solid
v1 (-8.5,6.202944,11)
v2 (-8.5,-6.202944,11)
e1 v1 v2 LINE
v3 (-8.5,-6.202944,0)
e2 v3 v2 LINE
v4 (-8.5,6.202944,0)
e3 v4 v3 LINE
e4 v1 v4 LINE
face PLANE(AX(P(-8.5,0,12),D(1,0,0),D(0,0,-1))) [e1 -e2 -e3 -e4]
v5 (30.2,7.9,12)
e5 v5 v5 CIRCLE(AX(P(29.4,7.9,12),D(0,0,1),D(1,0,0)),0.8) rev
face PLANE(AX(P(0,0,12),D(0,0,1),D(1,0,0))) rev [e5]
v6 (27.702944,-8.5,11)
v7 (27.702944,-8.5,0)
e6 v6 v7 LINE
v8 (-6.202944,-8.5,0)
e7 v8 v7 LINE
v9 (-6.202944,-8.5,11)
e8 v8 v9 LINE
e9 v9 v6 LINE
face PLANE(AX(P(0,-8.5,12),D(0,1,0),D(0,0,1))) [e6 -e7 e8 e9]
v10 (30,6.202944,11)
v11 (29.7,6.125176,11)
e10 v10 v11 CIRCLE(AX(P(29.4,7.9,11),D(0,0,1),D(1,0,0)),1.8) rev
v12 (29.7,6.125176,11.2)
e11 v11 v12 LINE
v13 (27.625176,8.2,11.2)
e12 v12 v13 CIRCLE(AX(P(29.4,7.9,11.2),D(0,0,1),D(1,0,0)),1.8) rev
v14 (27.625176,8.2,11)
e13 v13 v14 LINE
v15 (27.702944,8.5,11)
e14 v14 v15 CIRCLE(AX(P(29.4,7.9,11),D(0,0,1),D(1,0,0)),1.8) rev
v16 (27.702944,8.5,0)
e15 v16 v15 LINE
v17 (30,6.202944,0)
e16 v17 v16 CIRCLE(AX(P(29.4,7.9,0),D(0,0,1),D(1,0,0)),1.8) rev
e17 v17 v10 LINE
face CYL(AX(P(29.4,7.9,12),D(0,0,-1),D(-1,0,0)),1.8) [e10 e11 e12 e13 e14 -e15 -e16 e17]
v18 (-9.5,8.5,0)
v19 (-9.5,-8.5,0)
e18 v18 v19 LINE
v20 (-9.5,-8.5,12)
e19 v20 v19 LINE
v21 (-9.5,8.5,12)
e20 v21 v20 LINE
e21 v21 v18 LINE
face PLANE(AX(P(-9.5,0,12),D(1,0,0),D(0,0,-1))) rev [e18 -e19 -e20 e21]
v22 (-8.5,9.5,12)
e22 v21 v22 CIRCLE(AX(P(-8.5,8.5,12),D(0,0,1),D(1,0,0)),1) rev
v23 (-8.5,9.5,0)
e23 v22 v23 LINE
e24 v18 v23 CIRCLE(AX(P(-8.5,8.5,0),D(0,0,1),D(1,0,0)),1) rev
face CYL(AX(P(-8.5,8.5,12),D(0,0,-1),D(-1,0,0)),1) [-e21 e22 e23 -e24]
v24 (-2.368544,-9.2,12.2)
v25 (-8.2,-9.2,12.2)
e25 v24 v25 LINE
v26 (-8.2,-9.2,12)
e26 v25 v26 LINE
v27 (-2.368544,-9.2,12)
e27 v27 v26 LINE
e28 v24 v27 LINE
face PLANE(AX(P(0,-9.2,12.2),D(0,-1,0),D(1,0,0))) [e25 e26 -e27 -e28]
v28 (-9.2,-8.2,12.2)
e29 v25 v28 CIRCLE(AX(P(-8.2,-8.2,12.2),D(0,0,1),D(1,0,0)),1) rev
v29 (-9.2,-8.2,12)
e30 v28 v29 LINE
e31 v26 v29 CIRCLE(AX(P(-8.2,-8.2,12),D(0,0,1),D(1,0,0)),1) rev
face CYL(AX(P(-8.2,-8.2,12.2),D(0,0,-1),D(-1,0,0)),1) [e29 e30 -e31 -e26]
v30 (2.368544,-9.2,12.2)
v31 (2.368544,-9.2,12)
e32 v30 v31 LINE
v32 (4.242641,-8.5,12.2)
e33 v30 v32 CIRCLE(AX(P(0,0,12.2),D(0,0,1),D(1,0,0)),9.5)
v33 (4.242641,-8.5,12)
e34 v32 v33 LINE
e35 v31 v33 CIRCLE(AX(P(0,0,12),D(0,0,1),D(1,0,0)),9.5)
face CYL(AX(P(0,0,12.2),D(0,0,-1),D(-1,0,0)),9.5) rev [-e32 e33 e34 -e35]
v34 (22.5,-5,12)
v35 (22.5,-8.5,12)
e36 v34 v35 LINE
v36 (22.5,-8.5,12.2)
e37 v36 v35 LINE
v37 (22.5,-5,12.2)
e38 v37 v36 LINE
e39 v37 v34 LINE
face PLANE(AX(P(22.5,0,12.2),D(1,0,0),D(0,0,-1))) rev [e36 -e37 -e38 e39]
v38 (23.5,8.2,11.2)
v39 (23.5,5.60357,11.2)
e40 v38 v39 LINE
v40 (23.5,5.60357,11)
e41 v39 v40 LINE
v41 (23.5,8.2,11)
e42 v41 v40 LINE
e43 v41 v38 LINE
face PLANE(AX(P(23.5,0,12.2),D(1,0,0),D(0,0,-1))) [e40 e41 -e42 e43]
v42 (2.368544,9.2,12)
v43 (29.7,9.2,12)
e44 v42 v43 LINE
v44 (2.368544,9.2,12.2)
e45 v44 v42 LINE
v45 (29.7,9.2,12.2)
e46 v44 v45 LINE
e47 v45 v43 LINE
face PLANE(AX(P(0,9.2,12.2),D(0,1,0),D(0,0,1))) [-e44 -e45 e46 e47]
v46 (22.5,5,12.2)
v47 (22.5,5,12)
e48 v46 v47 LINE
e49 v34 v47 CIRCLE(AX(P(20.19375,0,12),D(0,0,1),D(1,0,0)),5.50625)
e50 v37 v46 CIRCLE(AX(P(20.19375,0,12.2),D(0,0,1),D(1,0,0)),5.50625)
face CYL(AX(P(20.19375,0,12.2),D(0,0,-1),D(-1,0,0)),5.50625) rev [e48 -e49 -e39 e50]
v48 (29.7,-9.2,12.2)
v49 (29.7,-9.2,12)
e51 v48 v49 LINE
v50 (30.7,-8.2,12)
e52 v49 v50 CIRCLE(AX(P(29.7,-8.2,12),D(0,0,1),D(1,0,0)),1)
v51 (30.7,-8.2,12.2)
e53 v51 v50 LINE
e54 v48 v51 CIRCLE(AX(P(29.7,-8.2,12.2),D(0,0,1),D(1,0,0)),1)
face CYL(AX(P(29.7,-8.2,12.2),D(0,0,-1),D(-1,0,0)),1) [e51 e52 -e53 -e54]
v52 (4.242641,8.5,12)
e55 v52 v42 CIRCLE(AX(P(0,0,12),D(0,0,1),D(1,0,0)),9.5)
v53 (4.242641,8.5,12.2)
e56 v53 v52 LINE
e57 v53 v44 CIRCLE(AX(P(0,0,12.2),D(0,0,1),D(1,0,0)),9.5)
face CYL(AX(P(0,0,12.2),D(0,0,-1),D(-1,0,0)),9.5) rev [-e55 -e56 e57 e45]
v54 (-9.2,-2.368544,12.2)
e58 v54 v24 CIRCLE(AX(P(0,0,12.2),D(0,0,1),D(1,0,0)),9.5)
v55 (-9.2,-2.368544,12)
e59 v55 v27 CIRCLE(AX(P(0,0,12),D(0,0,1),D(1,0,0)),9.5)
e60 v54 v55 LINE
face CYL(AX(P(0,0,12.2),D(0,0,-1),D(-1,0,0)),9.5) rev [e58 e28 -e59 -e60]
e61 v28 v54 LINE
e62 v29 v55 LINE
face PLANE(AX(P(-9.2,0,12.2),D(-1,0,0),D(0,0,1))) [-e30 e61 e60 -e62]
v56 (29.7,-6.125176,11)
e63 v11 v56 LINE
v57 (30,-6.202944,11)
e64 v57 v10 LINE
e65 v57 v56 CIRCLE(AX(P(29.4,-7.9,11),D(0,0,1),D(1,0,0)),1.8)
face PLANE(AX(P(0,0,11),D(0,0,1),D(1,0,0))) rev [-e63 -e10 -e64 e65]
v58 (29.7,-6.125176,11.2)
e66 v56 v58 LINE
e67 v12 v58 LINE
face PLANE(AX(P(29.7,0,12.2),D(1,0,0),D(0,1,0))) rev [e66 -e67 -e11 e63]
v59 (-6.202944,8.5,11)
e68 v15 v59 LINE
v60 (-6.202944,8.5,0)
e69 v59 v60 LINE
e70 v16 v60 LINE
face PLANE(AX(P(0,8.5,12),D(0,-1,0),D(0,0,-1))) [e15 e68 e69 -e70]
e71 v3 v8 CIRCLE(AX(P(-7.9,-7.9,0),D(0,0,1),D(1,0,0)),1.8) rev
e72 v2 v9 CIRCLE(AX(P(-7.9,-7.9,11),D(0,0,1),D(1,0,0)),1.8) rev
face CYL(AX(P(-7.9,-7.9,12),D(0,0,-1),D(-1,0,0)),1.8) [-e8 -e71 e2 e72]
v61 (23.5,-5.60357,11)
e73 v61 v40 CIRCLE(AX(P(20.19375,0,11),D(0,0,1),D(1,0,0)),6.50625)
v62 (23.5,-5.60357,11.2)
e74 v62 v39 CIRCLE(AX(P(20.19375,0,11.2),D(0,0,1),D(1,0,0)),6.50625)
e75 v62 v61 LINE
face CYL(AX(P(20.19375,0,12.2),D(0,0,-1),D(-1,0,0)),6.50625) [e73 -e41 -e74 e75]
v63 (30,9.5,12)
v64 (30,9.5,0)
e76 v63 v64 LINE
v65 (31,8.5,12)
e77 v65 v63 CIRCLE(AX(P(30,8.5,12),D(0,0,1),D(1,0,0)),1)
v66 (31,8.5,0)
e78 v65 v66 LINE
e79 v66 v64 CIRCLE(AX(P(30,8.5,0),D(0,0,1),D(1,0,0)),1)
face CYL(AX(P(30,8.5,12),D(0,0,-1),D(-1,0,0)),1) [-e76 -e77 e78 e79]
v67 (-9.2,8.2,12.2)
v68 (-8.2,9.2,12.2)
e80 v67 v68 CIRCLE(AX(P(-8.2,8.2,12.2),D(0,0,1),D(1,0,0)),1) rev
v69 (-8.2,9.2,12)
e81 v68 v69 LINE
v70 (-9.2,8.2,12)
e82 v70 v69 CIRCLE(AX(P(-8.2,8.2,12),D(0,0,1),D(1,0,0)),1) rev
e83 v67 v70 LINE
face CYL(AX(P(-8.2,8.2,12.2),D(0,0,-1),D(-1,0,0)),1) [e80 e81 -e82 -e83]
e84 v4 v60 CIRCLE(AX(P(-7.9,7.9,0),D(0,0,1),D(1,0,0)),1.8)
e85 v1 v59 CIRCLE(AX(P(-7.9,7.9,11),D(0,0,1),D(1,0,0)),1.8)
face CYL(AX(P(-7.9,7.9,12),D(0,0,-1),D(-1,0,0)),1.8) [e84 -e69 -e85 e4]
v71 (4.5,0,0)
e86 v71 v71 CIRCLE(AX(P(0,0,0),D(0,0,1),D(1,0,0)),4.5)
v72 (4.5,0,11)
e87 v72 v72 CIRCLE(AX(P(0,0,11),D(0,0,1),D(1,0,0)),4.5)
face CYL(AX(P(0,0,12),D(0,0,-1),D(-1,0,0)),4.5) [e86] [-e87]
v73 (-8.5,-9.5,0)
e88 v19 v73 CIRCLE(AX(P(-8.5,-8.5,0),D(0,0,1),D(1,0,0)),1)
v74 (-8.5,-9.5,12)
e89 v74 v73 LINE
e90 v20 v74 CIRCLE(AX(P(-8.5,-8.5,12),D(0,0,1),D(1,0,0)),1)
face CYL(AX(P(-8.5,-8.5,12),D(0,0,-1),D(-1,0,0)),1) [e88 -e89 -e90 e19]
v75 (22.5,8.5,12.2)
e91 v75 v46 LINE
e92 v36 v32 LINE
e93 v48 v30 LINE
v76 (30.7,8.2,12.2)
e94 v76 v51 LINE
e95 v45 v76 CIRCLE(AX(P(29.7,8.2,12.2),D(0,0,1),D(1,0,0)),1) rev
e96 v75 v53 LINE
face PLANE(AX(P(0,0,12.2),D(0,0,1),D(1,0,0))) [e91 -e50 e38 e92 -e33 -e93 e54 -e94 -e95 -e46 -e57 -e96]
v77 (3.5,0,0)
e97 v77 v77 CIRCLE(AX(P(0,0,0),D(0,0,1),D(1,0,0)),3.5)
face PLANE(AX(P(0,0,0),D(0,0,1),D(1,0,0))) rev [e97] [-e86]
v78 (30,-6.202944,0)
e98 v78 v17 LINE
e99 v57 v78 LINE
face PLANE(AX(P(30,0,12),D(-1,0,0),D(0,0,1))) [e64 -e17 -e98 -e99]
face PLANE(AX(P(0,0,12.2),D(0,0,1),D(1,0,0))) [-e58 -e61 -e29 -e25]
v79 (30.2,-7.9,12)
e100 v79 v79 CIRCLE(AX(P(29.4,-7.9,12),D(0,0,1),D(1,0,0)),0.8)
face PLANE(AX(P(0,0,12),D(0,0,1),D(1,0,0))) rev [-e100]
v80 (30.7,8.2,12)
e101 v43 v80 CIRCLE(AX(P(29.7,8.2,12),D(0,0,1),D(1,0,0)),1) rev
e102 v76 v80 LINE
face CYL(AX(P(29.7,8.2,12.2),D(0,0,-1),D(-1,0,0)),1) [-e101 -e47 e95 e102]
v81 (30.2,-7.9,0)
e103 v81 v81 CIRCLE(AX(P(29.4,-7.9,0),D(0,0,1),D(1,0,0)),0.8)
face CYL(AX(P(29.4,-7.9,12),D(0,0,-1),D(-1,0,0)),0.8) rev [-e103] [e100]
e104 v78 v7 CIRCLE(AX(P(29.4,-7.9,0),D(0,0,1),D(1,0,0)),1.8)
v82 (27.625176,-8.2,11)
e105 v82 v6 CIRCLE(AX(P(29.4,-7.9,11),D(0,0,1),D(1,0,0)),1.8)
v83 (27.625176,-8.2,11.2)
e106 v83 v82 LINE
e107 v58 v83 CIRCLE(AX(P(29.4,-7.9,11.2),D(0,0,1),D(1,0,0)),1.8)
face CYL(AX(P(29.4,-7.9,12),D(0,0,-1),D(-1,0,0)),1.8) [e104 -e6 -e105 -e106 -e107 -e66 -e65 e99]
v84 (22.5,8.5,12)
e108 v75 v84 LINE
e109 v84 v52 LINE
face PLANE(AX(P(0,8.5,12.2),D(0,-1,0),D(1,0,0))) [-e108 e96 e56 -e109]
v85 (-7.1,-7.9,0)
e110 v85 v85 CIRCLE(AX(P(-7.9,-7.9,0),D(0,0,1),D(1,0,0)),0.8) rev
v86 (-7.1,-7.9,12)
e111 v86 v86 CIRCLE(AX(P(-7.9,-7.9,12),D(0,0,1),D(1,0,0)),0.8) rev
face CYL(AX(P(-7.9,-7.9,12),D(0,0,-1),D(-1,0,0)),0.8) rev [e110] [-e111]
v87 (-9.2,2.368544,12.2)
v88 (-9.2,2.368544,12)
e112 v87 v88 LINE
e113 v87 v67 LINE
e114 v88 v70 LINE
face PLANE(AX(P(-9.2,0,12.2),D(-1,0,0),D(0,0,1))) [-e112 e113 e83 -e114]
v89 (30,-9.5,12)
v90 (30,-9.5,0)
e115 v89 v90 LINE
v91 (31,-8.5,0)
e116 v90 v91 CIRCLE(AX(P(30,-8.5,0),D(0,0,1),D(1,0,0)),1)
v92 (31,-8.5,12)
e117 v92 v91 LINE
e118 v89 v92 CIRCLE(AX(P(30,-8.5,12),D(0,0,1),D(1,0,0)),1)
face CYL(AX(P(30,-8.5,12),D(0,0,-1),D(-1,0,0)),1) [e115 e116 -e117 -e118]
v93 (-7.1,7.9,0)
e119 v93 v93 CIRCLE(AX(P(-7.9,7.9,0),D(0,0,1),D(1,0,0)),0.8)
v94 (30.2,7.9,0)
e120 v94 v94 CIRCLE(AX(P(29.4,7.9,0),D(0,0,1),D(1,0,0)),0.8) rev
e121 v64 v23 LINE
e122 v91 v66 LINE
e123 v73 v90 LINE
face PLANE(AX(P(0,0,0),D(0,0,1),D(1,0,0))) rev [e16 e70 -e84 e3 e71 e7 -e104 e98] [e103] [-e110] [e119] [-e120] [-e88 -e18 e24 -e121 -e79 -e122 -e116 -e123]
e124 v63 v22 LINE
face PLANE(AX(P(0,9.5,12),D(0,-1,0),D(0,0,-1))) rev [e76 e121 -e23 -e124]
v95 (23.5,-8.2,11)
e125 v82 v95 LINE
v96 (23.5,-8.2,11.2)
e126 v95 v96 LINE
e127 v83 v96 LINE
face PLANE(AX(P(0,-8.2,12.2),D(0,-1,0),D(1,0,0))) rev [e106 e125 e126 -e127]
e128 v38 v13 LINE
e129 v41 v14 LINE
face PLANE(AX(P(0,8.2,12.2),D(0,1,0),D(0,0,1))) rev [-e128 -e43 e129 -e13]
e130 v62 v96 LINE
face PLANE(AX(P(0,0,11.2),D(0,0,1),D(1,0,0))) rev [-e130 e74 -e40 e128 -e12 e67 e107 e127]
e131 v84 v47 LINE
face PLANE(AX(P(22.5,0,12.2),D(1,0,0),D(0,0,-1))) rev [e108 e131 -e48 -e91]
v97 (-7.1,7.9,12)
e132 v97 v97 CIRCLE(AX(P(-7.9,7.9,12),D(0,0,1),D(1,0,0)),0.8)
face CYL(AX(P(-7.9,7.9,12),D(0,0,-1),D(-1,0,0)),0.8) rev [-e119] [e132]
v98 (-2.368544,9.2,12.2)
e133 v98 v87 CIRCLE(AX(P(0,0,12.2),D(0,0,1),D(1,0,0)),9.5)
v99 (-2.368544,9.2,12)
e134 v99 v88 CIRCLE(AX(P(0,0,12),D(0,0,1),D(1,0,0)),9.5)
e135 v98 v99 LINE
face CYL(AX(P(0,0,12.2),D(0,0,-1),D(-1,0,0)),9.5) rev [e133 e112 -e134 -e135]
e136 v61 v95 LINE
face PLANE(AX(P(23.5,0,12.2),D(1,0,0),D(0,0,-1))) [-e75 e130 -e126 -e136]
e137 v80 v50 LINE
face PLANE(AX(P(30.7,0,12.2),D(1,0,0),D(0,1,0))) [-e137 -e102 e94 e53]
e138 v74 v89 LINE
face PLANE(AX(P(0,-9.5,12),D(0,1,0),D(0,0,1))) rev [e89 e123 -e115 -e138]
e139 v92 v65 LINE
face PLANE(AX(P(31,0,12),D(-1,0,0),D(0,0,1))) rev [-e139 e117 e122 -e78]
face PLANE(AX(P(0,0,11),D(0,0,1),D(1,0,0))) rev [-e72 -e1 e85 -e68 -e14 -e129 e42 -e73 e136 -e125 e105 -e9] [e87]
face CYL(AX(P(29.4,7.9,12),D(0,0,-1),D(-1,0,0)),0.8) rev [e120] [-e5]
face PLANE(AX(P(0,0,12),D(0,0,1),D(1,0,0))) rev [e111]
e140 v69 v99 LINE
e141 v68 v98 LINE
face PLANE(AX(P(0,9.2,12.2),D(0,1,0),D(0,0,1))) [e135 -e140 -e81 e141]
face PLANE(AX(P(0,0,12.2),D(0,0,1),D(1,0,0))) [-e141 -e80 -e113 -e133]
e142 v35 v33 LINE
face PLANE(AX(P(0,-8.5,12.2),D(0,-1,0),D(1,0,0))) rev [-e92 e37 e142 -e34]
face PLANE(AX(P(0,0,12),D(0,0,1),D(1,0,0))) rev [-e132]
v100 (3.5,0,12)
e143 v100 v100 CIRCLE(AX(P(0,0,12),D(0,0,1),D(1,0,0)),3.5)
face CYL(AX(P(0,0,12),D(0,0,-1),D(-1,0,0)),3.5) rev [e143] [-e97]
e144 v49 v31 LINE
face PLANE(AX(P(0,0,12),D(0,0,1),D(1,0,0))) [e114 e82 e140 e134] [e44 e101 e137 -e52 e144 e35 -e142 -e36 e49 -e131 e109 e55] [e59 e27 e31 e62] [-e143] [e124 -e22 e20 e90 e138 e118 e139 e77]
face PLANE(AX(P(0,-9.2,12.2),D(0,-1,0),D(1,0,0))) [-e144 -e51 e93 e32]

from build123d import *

# Parameters (mm, degrees)
CROQUIS1_R              = 3.5
CROQUIS1_R_2            = 0.8
SALIENTE_EXTRUIR1_DEPTH = 12
SALIENTE_EXTRUIR2_DEPTH = 0.2
VACIADO6_OUTLINE_R      = 4.5
VACIADO6_DEPTH          = 11
VACIADO6_START          = 11
VACIADO6_2_DEPTH        = 0.2


# Read off the part's stored shape, not the designer's step: Vaciado6
with BuildPart() as part:
    # Croquis1 → Saliente-Extruir1 (new body)
    with BuildSketch(Plane.XY):
        with BuildLine():
            Line((-9.5, 8.5), (-9.5, -8.5))
            ThreePointArc((-9.5, -8.5), (-9.207106781, -9.207106781), (-8.5, -9.5))
            Line((-8.5, -9.5), (30, -9.5))
            ThreePointArc((30, -9.5), (30.707106781, -9.207106781), (31, -8.5))
            Line((31, -8.5), (31, 8.5))
            ThreePointArc((31, 8.5), (30.707106781, 9.207106781), (30, 9.5))
            Line((30, 9.5), (-8.5, 9.5))
            ThreePointArc((-8.5, 9.5), (-9.207106781, 9.207106781), (-9.5, 8.5))
        make_face()
        Circle(CROQUIS1_R, mode=Mode.SUBTRACT)
        with Locations((29.4, -7.9)):
            Circle(CROQUIS1_R_2, mode=Mode.SUBTRACT)
        with Locations((-7.9, -7.9)):
            Circle(CROQUIS1_R_2, mode=Mode.SUBTRACT)
        with Locations((-7.9, 7.9)):
            Circle(CROQUIS1_R_2, mode=Mode.SUBTRACT)
        with Locations((29.4, 7.9)):
            Circle(CROQUIS1_R_2, mode=Mode.SUBTRACT)
    extrude(amount=SALIENTE_EXTRUIR1_DEPTH)

    # Croquis2 → Saliente-Extruir2 (add)
    with BuildSketch(Plane.XY.offset(12)):
        with BuildLine():
            Line((2.368543856, -9.2), (29.7, -9.2))
            ThreePointArc((29.7, -9.2), (30.407106781, -8.907106781), (30.7, -8.2))
            Line((30.7, -8.2), (30.7, 8.2))
            ThreePointArc((30.7, 8.2), (30.407106781, 8.907106781), (29.7, 9.2))
            Line((29.7, 9.2), (2.368543856, 9.2))
            ThreePointArc((2.368543856, 9.2), (3.324069835, 8.899469632), (4.242640687, 8.5))
            Line((4.242640687, 8.5), (22.5, 8.5))
            Line((22.5, 8.5), (22.5, 5))
            ThreePointArc((22.5, 5), (25.7, 0), (22.5, -5))
            Line((22.5, -5), (22.5, -8.5))
            Line((22.5, -8.5), (4.242640687, -8.5))
            ThreePointArc((4.242640687, -8.5), (3.324069835, -8.899469632), (2.368543856, -9.2))
        make_face()
        with BuildLine():
            Line((-8.2, -9.2), (-2.368543856, -9.2))
            ThreePointArc((-2.368543856, -9.2), (-6.717514421, -6.717514421), (-9.2, -2.368543856))
            Line((-9.2, -2.368543856), (-9.2, -8.2))
            ThreePointArc((-9.2, -8.2), (-8.907106781, -8.907106781), (-8.2, -9.2))
        make_face()
        with BuildLine():
            Line((-9.2, 8.2), (-9.2, 2.368543856))
            ThreePointArc((-9.2, 2.368543856), (-6.717514421, 6.717514421), (-2.368543856, 9.2))
            Line((-2.368543856, 9.2), (-8.2, 9.2))
            ThreePointArc((-8.2, 9.2), (-8.907106781, 8.907106781), (-9.2, 8.2))
        make_face()
    extrude(amount=SALIENTE_EXTRUIR2_DEPTH)

    # Vaciado6 outline → Vaciado6 (cut)
    with BuildSketch(Plane.XY):
        with BuildLine():
            Line((27.702943725, 8.5), (-6.202943725, 8.5))
            ThreePointArc((-6.202943725, 8.5), (-6.627207794, 6.627207794), (-8.5, 6.202943725))
            Line((-8.5, 6.202943725), (-8.5, -6.202943725))
            ThreePointArc((-8.5, -6.202943725), (-6.627207794, -6.627207794), (-6.202943725, -8.5))
            Line((-6.202943725, -8.5), (27.702943725, -8.5))
            ThreePointArc((27.702943725, -8.5), (28.127207794, -6.627207794), (30, -6.202943725))
            Line((30, -6.202943725), (30, 6.202943725))
            ThreePointArc((30, 6.202943725), (28.127207794, 6.627207794), (27.702943725, 8.5))
        make_face()
        Circle(VACIADO6_OUTLINE_R, mode=Mode.SUBTRACT)
    extrude(amount=VACIADO6_DEPTH, mode=Mode.SUBTRACT)

    # Vaciado6 2 outline → Vaciado6 2 (cut)
    with BuildSketch(Plane.XY.offset(VACIADO6_START)):
        with BuildLine():
            ThreePointArc((29.7, 6.125176065), (28.127207794, 6.627207794), (27.625176065, 8.2))
            Line((27.625176065, 8.2), (23.5, 8.2))
            Line((23.5, 8.2), (23.5, 5.60357029))
            ThreePointArc((23.5, 5.60357029), (26.7, 0), (23.5, -5.60357029))
            Line((23.5, -5.60357029), (23.5, -8.2))
            Line((23.5, -8.2), (27.625176065, -8.2))
            ThreePointArc((27.625176065, -8.2), (28.127207794, -6.627207794), (29.7, -6.125176065))
            Line((29.7, -6.125176065), (29.7, 6.125176065))
        make_face()
    extrude(amount=VACIADO6_2_DEPTH, mode=Mode.SUBTRACT)


solid = part.part
